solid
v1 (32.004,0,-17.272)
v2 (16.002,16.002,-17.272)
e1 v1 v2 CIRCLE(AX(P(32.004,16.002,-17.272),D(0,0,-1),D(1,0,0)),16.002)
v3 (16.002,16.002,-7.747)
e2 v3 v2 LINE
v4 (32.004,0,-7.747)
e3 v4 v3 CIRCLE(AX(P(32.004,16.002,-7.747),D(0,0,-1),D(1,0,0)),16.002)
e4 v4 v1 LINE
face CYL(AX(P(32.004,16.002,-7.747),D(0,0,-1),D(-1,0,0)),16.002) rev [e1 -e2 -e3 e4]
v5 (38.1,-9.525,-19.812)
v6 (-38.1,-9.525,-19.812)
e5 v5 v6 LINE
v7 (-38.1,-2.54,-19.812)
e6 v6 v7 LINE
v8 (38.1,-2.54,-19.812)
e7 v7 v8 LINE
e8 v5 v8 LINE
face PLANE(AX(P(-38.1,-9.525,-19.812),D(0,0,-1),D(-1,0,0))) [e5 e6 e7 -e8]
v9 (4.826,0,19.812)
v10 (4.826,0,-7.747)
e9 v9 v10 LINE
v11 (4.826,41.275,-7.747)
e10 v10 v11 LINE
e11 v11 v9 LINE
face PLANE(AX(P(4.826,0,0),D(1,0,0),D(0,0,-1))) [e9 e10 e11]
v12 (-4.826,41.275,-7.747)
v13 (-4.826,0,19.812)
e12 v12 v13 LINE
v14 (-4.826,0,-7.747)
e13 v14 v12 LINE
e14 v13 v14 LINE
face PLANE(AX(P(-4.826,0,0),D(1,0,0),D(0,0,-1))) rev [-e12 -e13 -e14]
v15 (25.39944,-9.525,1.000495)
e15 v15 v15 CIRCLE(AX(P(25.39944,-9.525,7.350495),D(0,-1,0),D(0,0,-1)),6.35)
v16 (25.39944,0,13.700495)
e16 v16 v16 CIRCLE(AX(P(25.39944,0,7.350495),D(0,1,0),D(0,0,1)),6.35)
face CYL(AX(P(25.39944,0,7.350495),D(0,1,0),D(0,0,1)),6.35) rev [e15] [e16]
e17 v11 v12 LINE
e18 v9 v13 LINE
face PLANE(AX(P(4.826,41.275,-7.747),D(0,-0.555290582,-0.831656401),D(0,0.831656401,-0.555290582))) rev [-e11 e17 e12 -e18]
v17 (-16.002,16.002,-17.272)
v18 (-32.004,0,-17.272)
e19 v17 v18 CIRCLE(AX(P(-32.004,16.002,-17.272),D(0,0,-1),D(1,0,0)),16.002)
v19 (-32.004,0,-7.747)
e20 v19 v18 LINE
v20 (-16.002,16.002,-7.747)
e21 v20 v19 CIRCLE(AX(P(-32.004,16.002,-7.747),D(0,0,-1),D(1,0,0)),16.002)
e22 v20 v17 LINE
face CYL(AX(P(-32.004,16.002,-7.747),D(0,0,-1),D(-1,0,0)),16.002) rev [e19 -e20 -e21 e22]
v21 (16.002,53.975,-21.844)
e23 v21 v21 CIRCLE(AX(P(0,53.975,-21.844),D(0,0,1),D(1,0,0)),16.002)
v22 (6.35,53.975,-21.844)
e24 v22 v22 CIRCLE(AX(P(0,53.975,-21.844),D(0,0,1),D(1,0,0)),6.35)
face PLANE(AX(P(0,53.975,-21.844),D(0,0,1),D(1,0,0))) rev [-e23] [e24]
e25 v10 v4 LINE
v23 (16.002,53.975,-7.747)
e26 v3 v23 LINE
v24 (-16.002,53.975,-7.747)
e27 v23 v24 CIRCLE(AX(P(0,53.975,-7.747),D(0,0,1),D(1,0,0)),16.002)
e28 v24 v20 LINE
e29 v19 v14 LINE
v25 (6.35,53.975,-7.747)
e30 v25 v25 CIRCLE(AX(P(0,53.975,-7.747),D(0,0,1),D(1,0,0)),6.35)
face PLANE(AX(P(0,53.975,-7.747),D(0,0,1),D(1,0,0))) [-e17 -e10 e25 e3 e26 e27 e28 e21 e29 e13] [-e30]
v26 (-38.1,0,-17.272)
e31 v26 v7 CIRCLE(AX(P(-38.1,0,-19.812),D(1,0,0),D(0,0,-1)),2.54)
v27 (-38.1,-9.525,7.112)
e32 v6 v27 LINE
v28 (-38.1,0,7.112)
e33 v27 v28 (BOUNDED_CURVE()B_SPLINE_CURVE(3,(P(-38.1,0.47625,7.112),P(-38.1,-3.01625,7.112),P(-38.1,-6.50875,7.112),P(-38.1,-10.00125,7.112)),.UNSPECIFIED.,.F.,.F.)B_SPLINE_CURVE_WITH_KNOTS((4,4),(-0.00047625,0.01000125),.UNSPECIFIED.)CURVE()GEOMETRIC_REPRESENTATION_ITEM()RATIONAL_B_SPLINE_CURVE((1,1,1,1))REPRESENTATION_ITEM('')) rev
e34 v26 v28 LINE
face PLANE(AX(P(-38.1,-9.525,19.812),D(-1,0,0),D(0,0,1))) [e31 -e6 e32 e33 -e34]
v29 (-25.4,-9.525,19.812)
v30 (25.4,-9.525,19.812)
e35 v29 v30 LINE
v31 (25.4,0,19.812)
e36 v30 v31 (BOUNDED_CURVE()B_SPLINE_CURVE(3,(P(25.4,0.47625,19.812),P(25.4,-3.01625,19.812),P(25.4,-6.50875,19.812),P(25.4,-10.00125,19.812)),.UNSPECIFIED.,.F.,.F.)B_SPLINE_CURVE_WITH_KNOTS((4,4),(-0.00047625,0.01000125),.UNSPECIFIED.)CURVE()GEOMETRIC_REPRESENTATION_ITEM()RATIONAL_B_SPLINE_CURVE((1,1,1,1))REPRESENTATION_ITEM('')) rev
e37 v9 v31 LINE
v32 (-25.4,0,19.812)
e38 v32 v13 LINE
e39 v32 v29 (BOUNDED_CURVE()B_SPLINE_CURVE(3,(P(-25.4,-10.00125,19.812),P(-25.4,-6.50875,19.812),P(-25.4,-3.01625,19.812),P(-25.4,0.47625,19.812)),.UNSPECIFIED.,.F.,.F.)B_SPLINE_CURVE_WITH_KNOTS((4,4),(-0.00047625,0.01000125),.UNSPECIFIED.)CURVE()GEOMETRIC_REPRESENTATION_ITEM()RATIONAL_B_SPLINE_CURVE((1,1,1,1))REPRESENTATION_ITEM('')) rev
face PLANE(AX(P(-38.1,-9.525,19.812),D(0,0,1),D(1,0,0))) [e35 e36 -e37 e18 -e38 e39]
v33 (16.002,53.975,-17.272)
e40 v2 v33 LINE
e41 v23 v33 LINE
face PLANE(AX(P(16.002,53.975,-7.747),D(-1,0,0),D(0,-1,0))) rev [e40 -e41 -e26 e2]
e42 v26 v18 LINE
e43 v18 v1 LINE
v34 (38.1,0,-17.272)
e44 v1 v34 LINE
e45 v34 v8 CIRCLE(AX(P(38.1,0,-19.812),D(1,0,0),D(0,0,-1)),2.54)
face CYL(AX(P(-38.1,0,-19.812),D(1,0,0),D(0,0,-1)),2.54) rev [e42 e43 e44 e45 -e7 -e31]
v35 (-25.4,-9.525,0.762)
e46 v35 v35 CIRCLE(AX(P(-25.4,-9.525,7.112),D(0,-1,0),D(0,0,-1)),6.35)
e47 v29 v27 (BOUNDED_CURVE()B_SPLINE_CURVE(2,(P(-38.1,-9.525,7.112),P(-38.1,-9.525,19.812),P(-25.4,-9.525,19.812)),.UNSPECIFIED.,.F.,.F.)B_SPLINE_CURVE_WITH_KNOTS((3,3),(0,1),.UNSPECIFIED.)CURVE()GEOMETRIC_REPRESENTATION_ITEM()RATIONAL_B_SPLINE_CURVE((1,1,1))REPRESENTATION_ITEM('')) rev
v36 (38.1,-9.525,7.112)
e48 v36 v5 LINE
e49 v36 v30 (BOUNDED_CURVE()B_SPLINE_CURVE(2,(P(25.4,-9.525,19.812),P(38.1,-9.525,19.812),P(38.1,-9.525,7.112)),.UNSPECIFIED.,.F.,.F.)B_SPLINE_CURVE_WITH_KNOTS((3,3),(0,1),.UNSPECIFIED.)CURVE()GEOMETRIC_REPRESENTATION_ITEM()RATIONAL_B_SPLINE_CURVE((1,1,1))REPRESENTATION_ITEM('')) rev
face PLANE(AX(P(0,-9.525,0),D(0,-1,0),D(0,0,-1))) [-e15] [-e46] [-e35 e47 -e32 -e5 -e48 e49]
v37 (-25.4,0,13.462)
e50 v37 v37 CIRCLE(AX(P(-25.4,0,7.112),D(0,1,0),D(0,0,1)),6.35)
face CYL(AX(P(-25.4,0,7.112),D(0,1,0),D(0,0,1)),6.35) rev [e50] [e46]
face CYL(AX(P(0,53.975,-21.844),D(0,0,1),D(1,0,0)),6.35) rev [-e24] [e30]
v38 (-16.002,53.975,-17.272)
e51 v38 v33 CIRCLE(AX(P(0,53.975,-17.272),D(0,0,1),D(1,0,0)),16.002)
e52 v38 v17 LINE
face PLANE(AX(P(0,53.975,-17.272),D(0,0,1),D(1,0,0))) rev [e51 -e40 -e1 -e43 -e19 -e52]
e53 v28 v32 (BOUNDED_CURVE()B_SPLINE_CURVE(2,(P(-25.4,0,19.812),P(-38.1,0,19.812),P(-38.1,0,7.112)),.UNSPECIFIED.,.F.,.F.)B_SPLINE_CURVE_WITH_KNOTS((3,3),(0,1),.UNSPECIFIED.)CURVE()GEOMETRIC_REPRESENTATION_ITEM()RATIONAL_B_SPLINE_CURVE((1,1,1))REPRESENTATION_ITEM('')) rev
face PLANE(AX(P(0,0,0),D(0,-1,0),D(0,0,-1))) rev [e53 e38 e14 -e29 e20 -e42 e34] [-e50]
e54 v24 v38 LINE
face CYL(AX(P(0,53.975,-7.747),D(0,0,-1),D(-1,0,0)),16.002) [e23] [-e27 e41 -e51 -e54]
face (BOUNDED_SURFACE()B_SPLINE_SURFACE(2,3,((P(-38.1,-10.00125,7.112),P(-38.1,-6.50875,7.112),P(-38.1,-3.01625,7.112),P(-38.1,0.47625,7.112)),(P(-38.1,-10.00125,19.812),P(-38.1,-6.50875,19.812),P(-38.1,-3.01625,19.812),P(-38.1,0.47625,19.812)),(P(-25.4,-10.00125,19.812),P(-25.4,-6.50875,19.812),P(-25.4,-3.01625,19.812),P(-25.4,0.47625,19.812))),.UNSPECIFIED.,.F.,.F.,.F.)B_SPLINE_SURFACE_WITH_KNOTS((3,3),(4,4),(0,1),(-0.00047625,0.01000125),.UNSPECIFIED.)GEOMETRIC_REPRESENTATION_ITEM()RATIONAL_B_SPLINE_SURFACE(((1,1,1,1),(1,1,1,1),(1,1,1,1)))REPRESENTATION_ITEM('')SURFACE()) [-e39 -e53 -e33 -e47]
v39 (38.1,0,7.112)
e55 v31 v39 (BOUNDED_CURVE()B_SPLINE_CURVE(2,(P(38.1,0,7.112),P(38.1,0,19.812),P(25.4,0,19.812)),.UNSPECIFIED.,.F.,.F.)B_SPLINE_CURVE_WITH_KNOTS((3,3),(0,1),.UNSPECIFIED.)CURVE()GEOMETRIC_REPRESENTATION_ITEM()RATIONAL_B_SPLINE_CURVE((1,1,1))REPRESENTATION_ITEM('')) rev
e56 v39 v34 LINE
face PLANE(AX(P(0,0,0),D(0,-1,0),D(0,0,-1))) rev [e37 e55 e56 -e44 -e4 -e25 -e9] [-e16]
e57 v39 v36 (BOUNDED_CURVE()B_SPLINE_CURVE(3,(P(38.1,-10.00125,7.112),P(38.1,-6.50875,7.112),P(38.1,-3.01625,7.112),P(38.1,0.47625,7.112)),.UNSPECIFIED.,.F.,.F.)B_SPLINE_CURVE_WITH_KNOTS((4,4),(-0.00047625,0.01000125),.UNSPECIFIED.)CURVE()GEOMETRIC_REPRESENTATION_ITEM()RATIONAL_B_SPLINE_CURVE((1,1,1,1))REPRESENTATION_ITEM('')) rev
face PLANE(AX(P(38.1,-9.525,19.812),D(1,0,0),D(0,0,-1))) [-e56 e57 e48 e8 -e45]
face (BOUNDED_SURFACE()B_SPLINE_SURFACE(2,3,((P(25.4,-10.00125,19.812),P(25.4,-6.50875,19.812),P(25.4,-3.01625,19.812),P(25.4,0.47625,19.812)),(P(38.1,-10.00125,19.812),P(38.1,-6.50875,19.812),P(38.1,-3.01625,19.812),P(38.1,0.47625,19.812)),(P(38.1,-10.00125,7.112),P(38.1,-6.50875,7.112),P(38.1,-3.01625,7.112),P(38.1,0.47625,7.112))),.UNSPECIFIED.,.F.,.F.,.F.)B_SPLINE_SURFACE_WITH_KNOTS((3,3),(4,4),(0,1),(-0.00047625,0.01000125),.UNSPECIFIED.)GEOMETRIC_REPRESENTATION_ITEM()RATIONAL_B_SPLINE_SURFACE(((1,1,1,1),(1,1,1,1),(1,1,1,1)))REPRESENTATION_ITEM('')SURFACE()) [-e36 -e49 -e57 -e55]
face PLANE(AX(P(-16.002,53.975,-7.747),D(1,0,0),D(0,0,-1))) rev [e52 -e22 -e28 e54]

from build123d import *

# Parameters (mm, degrees)
SKETCH1_W                  = 76.2
SKETCH1_H                  = 39.624
BOSS_EXTRUDE1_DEPTH        = 9.525
CUT_EXTRUDE1_DEPTH         = 80.307508907
FILLET1_SIZE               = 12.7
SKETCH12_R                 = 6.35
BOSS_EXTRUDE4_DEPTH        = 9.525
BOSS_EXTRUDE5_START        = -14.097
SKETCH13_R                 = 16.002
BOSS_EXTRUDE5_DEPTH        = 14.097
SKETCH14_R                 = 6.35
CUT_EXTRUDE4_DEPTH         = 85.308297475
BOSS_EXTRUDE6_DEPTH        = 4.826
F_3_8_0_5_DIAMETER_HOLE1_D = 12.7


with BuildPart() as part:
    # Sketch1 → Boss-Extrude1 (new body)
    with BuildSketch(Plane(origin=(0, 0, 0), x_dir=(1, 0, 0), z_dir=(0, 1, 0))):
        Rectangle(SKETCH1_W, SKETCH1_H)
    extrude(amount=-BOSS_EXTRUDE1_DEPTH)

    # Sketch2 → Cut-Extrude1 (cut, through all)
    with BuildSketch(Plane(origin=(38.1, 0, 0), x_dir=(0, 0, -1), z_dir=(1, 0, 0))):
        with BuildLine():
            Line((17.272, 0), (19.812, 0))
            Line((19.812, 0), (19.812, -2.54))
            ThreePointArc((19.812, -2.54), (18.015948776, -1.796051224), (17.272, 0))
        make_face()
    extrude(amount=-CUT_EXTRUDE1_DEPTH, mode=Mode.SUBTRACT)

    # Fillet1
    # a fillet whose section is not a circle: 12.7 mm, written as the material it takes off along each edge
    with BuildSketch(Plane(origin=(-38.1, 31.75, 19.812), x_dir=(1, 0, 0), z_dir=(0, -1, 0))) as fillet1_piece_1:
        with BuildLine():
            Bezier((FILLET1_SIZE, 0), (0, 0), (0, -FILLET1_SIZE), weights=[1, 1, 1])
            Line((0, -FILLET1_SIZE), (0, 0))
            Line((0, 0), (FILLET1_SIZE, 0))
        make_face()
    extrude(amount=73.025, mode=Mode.SUBTRACT)
    with BuildSketch(Plane(origin=(38.1, 31.75, 19.812), x_dir=(-1, 0, 0), z_dir=(0, -1, 0))) as fillet1_piece_2:
        with BuildLine():
            Bezier((FILLET1_SIZE, 0), (0, 0), (0, FILLET1_SIZE), weights=[1, 1, 1])
            Line((0, FILLET1_SIZE), (0, 0))
            Line((0, 0), (FILLET1_SIZE, 0))
        make_face()
    extrude(amount=73.025, mode=Mode.SUBTRACT)

    # Sketch12 → Boss-Extrude4 (add)
    with BuildSketch(Plane.XY.offset(-17.272)):
        with BuildLine():
            Line((-16.002, 53.975), (-16.002, 16.002))
            ThreePointArc((-16.002, 16.002), (-20.688877287, 4.686877287), (-32.004, 0))
            Line((-32.004, 0), (32.004, 0))
            ThreePointArc((32.004, 0), (20.688877287, 4.686877287), (16.002, 16.002))
            Line((16.002, 16.002), (16.002, 53.975))
            ThreePointArc((16.002, 53.975), (0, 69.977), (-16.002, 53.975))
        make_face()
        with Locations(Location((0, 53.975, 0), (0, 0, 180))):
            Circle(SKETCH12_R, mode=Mode.SUBTRACT)
    extrude(amount=BOSS_EXTRUDE4_DEPTH)

    # Sketch13 → Boss-Extrude5 (add)
    with BuildSketch(Plane.XY.offset(-7.747).offset(BOSS_EXTRUDE5_START)):
        with Locations((0, 53.975)):
            Circle(SKETCH13_R)
    extrude(amount=BOSS_EXTRUDE5_DEPTH)

    # Sketch14 → Cut-Extrude4 (cut, through all)
    with BuildSketch(Plane.XY.offset(-7.747)):
        with Locations((0, 53.975)):
            Circle(SKETCH14_R)
    extrude(amount=-CUT_EXTRUDE4_DEPTH, mode=Mode.SUBTRACT)

    # Sketch15 → Boss-Extrude6 (add, symmetric)
    with BuildSketch(Plane(origin=(0, 0, 0), x_dir=(0, 0, -1), z_dir=(1, 0, 0))):
        Polygon((7.747, 0), (7.747, 41.275), (-19.812, 0), align=None)
    extrude(amount=BOSS_EXTRUDE6_DEPTH, both=True)

    # 3/8 (0.5) Diameter Hole1 (through all)
    with Locations(Plane(origin=(-25.4, 0, 7.112), x_dir=(0, 0, 1), z_dir=(0, 1, 0))):
        with Locations((0, 0), (0.238495024, 50.799440156)):
            Hole(F_3_8_0_5_DIAMETER_HOLE1_D / 2)


solid = part.part
